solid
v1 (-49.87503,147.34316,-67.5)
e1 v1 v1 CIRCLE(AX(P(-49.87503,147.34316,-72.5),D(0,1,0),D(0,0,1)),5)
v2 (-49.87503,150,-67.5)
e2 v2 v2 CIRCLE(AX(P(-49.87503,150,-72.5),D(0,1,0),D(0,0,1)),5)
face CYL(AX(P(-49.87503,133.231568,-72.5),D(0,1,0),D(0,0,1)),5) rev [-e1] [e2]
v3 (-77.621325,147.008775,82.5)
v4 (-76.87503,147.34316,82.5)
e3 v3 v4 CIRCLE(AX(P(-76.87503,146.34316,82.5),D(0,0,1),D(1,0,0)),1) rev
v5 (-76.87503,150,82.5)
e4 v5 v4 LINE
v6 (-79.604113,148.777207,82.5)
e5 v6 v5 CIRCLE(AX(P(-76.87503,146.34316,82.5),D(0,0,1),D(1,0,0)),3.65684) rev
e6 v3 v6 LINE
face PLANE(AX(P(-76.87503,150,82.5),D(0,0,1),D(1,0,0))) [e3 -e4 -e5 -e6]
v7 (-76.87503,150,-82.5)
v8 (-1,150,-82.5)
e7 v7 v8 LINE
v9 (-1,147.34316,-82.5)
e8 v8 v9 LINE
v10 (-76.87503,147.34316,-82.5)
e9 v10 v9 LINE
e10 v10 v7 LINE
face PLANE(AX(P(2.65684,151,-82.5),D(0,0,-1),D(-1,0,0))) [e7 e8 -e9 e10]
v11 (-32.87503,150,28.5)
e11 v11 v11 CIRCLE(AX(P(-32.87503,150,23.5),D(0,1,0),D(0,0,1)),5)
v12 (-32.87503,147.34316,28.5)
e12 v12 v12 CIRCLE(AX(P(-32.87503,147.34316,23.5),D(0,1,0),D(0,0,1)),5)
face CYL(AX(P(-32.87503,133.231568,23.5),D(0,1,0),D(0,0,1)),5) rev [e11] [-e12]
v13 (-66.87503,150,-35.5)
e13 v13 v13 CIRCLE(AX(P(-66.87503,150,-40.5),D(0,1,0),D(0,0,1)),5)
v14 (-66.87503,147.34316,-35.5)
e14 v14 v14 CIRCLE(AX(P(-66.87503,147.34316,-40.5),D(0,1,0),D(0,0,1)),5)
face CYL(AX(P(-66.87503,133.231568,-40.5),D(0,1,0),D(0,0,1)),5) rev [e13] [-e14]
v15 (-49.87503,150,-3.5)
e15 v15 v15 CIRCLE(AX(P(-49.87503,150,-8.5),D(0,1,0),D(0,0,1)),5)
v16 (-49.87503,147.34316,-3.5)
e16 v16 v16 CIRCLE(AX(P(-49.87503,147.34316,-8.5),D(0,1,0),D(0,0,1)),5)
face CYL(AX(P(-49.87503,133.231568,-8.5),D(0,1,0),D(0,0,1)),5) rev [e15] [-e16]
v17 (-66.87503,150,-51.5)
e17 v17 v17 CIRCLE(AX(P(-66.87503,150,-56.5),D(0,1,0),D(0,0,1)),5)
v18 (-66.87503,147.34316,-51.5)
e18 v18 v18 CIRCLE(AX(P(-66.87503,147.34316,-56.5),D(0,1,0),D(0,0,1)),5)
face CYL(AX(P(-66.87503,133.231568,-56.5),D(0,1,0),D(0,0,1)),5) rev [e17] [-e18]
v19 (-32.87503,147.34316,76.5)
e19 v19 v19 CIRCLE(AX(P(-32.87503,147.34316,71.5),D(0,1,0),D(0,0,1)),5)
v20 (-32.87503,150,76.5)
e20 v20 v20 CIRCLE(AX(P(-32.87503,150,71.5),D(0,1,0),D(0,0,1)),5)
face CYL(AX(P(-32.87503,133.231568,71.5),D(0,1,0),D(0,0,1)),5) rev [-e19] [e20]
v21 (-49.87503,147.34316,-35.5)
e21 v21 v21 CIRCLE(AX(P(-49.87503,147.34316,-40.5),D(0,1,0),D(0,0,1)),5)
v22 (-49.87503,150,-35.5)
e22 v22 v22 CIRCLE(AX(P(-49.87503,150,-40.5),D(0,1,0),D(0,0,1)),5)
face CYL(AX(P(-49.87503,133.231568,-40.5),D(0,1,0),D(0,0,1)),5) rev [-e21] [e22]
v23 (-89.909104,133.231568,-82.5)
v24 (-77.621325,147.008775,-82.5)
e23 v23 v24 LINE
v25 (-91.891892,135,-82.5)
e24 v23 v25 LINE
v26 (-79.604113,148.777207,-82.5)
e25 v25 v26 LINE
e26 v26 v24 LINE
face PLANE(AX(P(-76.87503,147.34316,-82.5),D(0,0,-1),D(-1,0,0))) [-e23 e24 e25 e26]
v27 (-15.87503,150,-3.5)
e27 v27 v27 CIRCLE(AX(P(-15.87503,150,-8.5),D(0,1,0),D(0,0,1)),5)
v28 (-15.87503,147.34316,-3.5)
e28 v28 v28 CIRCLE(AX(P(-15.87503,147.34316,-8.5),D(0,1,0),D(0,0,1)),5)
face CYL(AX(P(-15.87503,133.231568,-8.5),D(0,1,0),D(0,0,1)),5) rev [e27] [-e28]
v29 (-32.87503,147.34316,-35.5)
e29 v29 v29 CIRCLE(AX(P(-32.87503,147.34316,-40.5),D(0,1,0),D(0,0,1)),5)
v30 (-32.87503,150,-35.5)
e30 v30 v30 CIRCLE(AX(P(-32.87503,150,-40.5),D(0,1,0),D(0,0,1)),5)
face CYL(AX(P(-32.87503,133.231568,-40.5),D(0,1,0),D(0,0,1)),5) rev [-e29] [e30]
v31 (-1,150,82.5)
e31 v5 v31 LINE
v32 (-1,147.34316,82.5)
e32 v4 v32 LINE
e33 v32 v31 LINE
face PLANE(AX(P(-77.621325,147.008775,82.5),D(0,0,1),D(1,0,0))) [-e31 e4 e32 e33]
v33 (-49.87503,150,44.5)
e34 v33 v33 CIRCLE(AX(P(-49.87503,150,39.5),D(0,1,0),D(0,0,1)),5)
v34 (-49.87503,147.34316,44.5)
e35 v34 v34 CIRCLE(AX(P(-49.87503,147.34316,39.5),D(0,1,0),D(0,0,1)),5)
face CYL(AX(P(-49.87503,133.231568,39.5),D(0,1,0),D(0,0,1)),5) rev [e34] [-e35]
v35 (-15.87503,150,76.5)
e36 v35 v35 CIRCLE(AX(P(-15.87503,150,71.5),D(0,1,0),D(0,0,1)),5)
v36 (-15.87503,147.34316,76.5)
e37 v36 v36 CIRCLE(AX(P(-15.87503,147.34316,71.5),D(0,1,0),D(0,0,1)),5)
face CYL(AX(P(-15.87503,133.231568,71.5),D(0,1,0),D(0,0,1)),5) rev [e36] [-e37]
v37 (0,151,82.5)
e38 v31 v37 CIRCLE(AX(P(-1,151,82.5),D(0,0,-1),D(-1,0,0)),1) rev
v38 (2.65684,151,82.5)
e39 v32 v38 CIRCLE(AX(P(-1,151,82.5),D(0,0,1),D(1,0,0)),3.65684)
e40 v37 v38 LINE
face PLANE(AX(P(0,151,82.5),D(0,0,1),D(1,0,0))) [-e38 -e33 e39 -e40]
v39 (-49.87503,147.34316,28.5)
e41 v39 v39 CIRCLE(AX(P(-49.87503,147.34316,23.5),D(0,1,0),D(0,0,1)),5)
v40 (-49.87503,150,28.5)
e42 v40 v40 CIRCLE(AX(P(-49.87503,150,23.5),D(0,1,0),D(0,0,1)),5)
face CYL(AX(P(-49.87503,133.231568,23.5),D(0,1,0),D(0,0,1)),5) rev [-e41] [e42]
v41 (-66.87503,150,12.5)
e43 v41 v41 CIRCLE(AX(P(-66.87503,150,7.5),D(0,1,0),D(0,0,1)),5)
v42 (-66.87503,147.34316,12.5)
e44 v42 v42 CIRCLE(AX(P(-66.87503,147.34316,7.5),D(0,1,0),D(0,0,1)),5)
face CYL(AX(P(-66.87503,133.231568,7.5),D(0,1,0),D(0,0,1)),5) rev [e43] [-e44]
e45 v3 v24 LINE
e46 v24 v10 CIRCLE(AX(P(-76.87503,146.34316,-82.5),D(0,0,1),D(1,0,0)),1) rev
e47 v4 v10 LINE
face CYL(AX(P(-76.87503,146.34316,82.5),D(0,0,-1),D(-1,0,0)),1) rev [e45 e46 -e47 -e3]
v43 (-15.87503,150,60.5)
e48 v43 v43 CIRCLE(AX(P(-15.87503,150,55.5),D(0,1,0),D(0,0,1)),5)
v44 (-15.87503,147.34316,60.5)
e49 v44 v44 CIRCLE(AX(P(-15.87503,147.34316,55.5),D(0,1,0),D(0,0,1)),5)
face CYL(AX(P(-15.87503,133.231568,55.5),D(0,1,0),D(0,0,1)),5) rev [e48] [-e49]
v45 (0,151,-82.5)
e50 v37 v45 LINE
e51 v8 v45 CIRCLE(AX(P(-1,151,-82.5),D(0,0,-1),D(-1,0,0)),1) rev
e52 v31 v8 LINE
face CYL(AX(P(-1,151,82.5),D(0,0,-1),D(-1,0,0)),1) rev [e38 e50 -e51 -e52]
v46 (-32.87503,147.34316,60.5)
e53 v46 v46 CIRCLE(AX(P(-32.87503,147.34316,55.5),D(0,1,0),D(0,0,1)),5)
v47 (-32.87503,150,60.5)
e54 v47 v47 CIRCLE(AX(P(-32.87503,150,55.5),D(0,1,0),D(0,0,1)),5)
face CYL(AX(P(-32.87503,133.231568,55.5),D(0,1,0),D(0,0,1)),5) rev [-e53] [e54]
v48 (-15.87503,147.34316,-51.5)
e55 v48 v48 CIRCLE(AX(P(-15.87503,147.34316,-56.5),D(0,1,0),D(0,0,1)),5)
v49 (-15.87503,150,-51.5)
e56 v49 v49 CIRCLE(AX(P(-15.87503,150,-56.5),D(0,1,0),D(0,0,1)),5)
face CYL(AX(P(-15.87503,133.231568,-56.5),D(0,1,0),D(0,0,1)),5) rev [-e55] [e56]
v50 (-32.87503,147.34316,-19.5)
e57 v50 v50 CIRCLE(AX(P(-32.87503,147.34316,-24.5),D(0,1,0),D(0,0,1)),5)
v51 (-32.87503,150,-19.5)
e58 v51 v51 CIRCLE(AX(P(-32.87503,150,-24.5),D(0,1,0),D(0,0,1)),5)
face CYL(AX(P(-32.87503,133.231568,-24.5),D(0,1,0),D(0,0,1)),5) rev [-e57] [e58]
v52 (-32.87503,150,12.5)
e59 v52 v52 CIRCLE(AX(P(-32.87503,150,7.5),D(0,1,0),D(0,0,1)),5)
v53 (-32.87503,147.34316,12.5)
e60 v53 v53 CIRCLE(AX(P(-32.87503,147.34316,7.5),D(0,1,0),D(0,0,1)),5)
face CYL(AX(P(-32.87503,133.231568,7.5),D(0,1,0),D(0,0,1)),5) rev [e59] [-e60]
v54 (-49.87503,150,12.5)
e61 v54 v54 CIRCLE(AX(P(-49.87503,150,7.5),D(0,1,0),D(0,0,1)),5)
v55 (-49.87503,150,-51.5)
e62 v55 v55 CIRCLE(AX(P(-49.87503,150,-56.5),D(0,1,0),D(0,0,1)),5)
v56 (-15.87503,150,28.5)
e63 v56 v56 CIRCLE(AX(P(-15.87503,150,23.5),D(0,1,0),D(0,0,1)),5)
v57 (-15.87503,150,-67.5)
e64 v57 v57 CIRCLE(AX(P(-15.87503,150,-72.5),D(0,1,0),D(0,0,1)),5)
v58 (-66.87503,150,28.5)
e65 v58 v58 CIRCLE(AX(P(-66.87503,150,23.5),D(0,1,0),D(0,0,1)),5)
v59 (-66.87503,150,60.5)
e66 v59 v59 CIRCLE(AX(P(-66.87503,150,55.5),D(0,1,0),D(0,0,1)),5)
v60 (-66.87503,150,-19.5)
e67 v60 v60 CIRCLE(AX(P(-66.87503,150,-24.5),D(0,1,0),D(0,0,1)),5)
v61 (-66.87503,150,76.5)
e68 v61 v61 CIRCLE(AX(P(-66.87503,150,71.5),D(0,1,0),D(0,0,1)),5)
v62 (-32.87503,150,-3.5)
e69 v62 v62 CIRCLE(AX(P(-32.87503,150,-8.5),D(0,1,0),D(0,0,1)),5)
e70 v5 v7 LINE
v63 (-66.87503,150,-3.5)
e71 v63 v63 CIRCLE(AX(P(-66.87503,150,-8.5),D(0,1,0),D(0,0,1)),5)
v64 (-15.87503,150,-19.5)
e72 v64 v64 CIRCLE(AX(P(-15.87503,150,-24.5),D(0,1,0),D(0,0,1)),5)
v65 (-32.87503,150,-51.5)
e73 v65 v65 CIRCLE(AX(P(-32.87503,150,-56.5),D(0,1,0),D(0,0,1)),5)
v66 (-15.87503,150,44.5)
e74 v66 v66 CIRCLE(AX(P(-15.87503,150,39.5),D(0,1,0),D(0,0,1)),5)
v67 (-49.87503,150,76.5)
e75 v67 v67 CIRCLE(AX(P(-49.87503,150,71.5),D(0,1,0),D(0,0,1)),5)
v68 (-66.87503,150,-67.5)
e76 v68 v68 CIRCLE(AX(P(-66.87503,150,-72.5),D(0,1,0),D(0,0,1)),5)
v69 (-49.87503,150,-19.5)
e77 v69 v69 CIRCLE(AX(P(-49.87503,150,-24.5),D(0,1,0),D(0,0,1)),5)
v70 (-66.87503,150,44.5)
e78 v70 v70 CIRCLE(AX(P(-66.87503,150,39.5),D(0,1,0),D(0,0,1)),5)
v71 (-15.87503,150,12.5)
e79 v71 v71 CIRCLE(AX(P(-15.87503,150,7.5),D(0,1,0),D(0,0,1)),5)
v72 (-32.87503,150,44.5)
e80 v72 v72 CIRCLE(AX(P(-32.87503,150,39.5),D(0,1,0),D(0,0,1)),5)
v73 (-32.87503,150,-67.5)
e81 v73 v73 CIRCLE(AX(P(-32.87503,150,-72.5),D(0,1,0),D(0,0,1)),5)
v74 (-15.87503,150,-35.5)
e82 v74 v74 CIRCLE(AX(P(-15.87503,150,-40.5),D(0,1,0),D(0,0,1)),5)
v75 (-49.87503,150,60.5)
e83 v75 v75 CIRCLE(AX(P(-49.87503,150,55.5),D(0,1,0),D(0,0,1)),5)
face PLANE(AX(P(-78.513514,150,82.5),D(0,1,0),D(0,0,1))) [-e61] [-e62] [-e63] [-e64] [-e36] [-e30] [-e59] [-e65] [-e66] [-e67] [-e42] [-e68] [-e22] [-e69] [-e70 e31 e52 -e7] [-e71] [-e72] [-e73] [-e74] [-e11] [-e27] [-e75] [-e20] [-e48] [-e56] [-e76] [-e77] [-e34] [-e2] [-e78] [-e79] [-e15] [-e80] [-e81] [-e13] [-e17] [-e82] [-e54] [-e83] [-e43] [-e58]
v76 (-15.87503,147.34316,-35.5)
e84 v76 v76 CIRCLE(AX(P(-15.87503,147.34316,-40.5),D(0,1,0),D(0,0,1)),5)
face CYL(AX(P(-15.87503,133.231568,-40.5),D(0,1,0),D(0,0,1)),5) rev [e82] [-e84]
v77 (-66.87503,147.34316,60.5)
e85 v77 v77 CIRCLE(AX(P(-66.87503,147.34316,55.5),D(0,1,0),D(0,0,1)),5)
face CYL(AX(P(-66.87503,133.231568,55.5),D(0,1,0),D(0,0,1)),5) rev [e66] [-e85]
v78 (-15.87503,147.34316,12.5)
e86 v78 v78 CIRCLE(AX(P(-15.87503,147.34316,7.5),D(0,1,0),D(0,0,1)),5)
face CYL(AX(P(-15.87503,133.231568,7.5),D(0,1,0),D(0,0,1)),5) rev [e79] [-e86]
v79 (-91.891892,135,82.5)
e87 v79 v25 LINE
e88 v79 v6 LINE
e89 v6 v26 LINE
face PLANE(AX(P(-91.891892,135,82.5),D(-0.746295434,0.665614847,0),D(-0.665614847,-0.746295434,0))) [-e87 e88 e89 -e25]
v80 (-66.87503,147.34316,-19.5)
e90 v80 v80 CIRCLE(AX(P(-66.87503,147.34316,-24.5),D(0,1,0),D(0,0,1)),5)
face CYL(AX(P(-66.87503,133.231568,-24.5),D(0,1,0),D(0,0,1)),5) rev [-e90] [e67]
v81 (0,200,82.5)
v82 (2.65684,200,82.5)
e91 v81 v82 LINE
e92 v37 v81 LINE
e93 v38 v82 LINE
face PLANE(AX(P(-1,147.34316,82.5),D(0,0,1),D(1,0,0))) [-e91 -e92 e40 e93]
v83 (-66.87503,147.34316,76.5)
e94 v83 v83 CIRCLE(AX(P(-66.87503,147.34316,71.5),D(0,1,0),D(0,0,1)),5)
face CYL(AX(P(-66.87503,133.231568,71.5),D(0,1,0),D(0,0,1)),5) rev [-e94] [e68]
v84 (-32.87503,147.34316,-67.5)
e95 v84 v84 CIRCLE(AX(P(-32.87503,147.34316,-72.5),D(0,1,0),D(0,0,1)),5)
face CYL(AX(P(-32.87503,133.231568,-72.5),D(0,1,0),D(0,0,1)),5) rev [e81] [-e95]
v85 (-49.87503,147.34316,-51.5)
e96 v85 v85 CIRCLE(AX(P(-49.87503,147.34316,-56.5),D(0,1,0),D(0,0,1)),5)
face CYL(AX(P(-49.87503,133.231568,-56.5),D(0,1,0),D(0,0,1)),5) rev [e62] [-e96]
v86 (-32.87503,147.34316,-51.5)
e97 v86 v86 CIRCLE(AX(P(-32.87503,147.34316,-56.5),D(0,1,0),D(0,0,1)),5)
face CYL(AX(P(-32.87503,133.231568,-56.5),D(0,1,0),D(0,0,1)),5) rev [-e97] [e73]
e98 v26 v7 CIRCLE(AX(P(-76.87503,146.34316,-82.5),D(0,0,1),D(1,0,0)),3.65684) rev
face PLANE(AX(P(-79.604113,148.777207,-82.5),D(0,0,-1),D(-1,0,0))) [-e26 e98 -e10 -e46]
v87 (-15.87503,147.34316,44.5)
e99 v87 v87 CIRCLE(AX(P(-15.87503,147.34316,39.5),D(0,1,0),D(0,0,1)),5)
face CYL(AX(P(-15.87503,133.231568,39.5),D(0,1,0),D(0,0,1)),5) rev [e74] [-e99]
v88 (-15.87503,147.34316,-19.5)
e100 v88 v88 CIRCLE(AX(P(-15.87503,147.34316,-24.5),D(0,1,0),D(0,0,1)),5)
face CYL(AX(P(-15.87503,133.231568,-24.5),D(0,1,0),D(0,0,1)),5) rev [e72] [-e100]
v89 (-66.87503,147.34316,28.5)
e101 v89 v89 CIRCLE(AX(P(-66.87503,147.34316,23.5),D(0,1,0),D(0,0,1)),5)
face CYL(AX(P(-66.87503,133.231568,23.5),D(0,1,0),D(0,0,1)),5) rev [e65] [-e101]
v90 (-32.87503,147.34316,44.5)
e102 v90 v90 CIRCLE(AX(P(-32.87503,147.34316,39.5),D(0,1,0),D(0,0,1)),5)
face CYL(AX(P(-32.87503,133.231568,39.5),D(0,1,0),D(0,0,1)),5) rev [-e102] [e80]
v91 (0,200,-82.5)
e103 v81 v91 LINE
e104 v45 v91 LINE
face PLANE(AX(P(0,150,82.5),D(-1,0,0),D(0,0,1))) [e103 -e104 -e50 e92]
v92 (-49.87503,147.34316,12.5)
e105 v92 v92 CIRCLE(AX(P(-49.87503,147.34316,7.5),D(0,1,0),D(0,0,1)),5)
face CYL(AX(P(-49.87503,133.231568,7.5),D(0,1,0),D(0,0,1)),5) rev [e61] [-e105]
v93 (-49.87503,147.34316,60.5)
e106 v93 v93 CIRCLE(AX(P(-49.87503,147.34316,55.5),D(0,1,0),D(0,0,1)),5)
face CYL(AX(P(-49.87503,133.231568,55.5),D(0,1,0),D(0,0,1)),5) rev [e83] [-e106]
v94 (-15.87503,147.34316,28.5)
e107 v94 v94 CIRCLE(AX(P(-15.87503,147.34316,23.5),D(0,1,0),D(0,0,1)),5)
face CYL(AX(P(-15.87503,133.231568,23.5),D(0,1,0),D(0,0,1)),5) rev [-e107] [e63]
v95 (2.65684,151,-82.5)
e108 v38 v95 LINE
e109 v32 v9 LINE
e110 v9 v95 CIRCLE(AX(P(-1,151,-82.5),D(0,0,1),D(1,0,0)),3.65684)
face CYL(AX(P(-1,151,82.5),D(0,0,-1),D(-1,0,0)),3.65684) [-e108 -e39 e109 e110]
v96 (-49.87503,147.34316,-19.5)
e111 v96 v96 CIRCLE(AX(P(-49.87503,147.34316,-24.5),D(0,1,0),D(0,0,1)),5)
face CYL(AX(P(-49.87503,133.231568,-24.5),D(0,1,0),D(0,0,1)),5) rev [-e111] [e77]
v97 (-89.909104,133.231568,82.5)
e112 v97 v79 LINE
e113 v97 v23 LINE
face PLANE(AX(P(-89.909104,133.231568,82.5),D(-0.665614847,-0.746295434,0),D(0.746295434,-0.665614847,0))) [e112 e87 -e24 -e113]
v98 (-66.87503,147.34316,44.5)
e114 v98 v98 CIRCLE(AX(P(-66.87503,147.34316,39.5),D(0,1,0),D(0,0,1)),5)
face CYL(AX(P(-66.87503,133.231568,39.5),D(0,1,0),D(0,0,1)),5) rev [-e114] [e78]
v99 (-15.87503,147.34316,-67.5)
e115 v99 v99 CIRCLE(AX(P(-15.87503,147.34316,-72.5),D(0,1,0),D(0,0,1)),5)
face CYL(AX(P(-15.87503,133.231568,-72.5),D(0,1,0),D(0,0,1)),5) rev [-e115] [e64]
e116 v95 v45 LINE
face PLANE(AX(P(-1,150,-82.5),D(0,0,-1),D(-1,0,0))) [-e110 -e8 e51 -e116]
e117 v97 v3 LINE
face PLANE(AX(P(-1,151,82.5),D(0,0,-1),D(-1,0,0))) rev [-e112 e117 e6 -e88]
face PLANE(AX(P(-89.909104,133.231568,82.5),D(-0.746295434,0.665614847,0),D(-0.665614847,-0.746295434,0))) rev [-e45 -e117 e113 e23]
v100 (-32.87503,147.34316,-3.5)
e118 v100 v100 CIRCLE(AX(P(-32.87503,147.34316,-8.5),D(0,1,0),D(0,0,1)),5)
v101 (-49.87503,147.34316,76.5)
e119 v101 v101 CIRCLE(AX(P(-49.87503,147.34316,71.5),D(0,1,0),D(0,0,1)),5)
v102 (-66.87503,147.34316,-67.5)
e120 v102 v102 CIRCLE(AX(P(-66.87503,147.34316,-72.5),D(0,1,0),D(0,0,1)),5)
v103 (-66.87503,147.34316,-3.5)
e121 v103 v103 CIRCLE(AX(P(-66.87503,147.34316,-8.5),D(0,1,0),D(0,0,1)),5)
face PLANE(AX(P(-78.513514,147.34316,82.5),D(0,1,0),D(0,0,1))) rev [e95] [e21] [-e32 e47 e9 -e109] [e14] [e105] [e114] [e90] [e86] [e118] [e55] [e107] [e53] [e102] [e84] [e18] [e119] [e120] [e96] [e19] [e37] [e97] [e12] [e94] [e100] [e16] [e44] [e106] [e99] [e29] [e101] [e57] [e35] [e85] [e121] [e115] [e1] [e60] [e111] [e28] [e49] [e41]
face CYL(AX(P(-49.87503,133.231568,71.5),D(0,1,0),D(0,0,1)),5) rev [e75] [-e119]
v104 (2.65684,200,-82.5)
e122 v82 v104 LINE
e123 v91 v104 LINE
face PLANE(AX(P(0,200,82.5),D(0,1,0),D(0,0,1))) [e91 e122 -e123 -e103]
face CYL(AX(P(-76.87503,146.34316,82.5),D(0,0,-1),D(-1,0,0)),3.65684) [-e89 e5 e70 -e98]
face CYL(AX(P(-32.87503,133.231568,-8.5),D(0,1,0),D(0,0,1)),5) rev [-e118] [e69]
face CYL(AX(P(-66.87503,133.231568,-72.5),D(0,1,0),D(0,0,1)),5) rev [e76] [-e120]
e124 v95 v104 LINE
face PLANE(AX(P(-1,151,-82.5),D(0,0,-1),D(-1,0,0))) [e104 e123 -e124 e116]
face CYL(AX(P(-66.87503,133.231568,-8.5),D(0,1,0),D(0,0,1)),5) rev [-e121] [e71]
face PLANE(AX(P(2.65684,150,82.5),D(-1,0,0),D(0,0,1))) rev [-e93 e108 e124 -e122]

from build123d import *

# Parameters (mm, degrees)
BASE_FLANGE1_DEPTH = 82.5
SKETCH2_R          = 5
CUT_EXTRUDE1_DEPTH = 134.230513755


# Sheet-metal steps are written as plain solids
with BuildPart() as part:
    # Sketch1 → Base-Flange1 (new, symmetric)
    with BuildSketch(Plane.XY):
        with BuildLine():
            Line((-91.891891892, 135), (-79.604112678, 148.777206997))
            ThreePointArc((-79.604112678, 148.777206997), (-78.370281896, 149.6803294), (-76.875029682, 150))
            Line((-76.875029682, 150), (-1, 150))
            ThreePointArc((-1, 150), (-0.292893219, 150.292893219), (0, 151))
            Line((0, 151), (0, 200))
            Line((0, 200), (2.65684, 200))
            Line((2.65684, 200), (2.65684, 151))
            ThreePointArc((2.65684, 151), (1.585776362, 148.414223638), (-1, 147.34316))
            Line((-1, 147.34316), (-76.875029682, 147.34316))
            ThreePointArc((-76.875029682, 147.34316), (-77.28392157, 147.255742831), (-77.621325116, 147.008774847))
            Line((-77.621325116, 147.008774847), (-89.90910433, 133.23156785))
            Line((-89.90910433, 133.23156785), (-91.891891892, 135))
        make_face()
    extrude(amount=BASE_FLANGE1_DEPTH, both=True)

    # Sketch2 → Cut-Extrude1 (cut, through all)
    with BuildSketch(Plane(origin=(0, 150, 0), x_dir=(1, 0, 0), z_dir=(0, 1, 0))):
        with Locations(Location((-66.875029682, 72.5, 0), (0, 0, 270))):
            Circle(SKETCH2_R)
        with Locations(Location((-49.875029682, 72.5, 0), (0, 0, 270))):
            Circle(SKETCH2_R)
        with Locations(Location((-32.875029682, 72.5, 0), (0, 0, 270))):
            Circle(SKETCH2_R)
        with Locations(Location((-15.875029682, 72.5, 0), (0, 0, 270))):
            Circle(SKETCH2_R)
        with Locations(Location((-66.875029682, 56.5, 0), (0, 0, 270))):
            Circle(SKETCH2_R)
        with Locations(Location((-49.875029682, 56.5, 0), (0, 0, 270))):
            Circle(SKETCH2_R)
        with Locations(Location((-32.875029682, 56.5, 0), (0, 0, 270))):
            Circle(SKETCH2_R)
        with Locations(Location((-15.875029682, 56.5, 0), (0, 0, 270))):
            Circle(SKETCH2_R)
        with Locations(Location((-66.875029682, 40.5, 0), (0, 0, 270))):
            Circle(SKETCH2_R)
        with Locations(Location((-49.875029682, 40.5, 0), (0, 0, 270))):
            Circle(SKETCH2_R)
        with Locations(Location((-32.875029682, 40.5, 0), (0, 0, 270))):
            Circle(SKETCH2_R)
        with Locations(Location((-15.875029682, 40.5, 0), (0, 0, 270))):
            Circle(SKETCH2_R)
        with Locations(Location((-66.875029682, 24.5, 0), (0, 0, 270))):
            Circle(SKETCH2_R)
        with Locations(Location((-49.875029682, 24.5, 0), (0, 0, 270))):
            Circle(SKETCH2_R)
        with Locations(Location((-32.875029682, 24.5, 0), (0, 0, 270))):
            Circle(SKETCH2_R)
        with Locations(Location((-15.875029682, 24.5, 0), (0, 0, 270))):
            Circle(SKETCH2_R)
        with Locations(Location((-66.875029682, 8.5, 0), (0, 0, 270))):
            Circle(SKETCH2_R)
        with Locations(Location((-49.875029682, 8.5, 0), (0, 0, 270))):
            Circle(SKETCH2_R)
        with Locations(Location((-32.875029682, 8.5, 0), (0, 0, 270))):
            Circle(SKETCH2_R)
        with Locations(Location((-15.875029682, 8.5, 0), (0, 0, 270))):
            Circle(SKETCH2_R)
        with Locations(Location((-66.875029682, -7.5, 0), (0, 0, 270))):
            Circle(SKETCH2_R)
        with Locations(Location((-49.875029682, -7.5, 0), (0, 0, 270))):
            Circle(SKETCH2_R)
        with Locations(Location((-32.875029682, -7.5, 0), (0, 0, 270))):
            Circle(SKETCH2_R)
        with Locations(Location((-15.875029682, -7.5, 0), (0, 0, 270))):
            Circle(SKETCH2_R)
        with Locations(Location((-66.875029682, -23.5, 0), (0, 0, 270))):
            Circle(SKETCH2_R)
        with Locations(Location((-49.875029682, -23.5, 0), (0, 0, 270))):
            Circle(SKETCH2_R)
        with Locations(Location((-32.875029682, -23.5, 0), (0, 0, 270))):
            Circle(SKETCH2_R)
        with Locations(Location((-15.875029682, -23.5, 0), (0, 0, 270))):
            Circle(SKETCH2_R)
        with Locations(Location((-66.875029682, -39.5, 0), (0, 0, 270))):
            Circle(SKETCH2_R)
        with Locations(Location((-49.875029682, -39.5, 0), (0, 0, 270))):
            Circle(SKETCH2_R)
        with Locations(Location((-32.875029682, -39.5, 0), (0, 0, 270))):
            Circle(SKETCH2_R)
        with Locations(Location((-15.875029682, -39.5, 0), (0, 0, 270))):
            Circle(SKETCH2_R)
        with Locations(Location((-66.875029682, -55.5, 0), (0, 0, 270))):
            Circle(SKETCH2_R)
        with Locations(Location((-49.875029682, -55.5, 0), (0, 0, 270))):
            Circle(SKETCH2_R)
        with Locations(Location((-32.875029682, -55.5, 0), (0, 0, 270))):
            Circle(SKETCH2_R)
        with Locations(Location((-15.875029682, -55.5, 0), (0, 0, 270))):
            Circle(SKETCH2_R)
        with Locations(Location((-66.875029682, -71.5, 0), (0, 0, 270))):
            Circle(SKETCH2_R)
        with Locations(Location((-49.875029682, -71.5, 0), (0, 0, 270))):
            Circle(SKETCH2_R)
        with Locations(Location((-32.875029682, -71.5, 0), (0, 0, 270))):
            Circle(SKETCH2_R)
        with Locations(Location((-15.875029682, -71.5, 0), (0, 0, 270))):
            Circle(SKETCH2_R)
    extrude(amount=-CUT_EXTRUDE1_DEPTH, mode=Mode.SUBTRACT)


solid = part.part
